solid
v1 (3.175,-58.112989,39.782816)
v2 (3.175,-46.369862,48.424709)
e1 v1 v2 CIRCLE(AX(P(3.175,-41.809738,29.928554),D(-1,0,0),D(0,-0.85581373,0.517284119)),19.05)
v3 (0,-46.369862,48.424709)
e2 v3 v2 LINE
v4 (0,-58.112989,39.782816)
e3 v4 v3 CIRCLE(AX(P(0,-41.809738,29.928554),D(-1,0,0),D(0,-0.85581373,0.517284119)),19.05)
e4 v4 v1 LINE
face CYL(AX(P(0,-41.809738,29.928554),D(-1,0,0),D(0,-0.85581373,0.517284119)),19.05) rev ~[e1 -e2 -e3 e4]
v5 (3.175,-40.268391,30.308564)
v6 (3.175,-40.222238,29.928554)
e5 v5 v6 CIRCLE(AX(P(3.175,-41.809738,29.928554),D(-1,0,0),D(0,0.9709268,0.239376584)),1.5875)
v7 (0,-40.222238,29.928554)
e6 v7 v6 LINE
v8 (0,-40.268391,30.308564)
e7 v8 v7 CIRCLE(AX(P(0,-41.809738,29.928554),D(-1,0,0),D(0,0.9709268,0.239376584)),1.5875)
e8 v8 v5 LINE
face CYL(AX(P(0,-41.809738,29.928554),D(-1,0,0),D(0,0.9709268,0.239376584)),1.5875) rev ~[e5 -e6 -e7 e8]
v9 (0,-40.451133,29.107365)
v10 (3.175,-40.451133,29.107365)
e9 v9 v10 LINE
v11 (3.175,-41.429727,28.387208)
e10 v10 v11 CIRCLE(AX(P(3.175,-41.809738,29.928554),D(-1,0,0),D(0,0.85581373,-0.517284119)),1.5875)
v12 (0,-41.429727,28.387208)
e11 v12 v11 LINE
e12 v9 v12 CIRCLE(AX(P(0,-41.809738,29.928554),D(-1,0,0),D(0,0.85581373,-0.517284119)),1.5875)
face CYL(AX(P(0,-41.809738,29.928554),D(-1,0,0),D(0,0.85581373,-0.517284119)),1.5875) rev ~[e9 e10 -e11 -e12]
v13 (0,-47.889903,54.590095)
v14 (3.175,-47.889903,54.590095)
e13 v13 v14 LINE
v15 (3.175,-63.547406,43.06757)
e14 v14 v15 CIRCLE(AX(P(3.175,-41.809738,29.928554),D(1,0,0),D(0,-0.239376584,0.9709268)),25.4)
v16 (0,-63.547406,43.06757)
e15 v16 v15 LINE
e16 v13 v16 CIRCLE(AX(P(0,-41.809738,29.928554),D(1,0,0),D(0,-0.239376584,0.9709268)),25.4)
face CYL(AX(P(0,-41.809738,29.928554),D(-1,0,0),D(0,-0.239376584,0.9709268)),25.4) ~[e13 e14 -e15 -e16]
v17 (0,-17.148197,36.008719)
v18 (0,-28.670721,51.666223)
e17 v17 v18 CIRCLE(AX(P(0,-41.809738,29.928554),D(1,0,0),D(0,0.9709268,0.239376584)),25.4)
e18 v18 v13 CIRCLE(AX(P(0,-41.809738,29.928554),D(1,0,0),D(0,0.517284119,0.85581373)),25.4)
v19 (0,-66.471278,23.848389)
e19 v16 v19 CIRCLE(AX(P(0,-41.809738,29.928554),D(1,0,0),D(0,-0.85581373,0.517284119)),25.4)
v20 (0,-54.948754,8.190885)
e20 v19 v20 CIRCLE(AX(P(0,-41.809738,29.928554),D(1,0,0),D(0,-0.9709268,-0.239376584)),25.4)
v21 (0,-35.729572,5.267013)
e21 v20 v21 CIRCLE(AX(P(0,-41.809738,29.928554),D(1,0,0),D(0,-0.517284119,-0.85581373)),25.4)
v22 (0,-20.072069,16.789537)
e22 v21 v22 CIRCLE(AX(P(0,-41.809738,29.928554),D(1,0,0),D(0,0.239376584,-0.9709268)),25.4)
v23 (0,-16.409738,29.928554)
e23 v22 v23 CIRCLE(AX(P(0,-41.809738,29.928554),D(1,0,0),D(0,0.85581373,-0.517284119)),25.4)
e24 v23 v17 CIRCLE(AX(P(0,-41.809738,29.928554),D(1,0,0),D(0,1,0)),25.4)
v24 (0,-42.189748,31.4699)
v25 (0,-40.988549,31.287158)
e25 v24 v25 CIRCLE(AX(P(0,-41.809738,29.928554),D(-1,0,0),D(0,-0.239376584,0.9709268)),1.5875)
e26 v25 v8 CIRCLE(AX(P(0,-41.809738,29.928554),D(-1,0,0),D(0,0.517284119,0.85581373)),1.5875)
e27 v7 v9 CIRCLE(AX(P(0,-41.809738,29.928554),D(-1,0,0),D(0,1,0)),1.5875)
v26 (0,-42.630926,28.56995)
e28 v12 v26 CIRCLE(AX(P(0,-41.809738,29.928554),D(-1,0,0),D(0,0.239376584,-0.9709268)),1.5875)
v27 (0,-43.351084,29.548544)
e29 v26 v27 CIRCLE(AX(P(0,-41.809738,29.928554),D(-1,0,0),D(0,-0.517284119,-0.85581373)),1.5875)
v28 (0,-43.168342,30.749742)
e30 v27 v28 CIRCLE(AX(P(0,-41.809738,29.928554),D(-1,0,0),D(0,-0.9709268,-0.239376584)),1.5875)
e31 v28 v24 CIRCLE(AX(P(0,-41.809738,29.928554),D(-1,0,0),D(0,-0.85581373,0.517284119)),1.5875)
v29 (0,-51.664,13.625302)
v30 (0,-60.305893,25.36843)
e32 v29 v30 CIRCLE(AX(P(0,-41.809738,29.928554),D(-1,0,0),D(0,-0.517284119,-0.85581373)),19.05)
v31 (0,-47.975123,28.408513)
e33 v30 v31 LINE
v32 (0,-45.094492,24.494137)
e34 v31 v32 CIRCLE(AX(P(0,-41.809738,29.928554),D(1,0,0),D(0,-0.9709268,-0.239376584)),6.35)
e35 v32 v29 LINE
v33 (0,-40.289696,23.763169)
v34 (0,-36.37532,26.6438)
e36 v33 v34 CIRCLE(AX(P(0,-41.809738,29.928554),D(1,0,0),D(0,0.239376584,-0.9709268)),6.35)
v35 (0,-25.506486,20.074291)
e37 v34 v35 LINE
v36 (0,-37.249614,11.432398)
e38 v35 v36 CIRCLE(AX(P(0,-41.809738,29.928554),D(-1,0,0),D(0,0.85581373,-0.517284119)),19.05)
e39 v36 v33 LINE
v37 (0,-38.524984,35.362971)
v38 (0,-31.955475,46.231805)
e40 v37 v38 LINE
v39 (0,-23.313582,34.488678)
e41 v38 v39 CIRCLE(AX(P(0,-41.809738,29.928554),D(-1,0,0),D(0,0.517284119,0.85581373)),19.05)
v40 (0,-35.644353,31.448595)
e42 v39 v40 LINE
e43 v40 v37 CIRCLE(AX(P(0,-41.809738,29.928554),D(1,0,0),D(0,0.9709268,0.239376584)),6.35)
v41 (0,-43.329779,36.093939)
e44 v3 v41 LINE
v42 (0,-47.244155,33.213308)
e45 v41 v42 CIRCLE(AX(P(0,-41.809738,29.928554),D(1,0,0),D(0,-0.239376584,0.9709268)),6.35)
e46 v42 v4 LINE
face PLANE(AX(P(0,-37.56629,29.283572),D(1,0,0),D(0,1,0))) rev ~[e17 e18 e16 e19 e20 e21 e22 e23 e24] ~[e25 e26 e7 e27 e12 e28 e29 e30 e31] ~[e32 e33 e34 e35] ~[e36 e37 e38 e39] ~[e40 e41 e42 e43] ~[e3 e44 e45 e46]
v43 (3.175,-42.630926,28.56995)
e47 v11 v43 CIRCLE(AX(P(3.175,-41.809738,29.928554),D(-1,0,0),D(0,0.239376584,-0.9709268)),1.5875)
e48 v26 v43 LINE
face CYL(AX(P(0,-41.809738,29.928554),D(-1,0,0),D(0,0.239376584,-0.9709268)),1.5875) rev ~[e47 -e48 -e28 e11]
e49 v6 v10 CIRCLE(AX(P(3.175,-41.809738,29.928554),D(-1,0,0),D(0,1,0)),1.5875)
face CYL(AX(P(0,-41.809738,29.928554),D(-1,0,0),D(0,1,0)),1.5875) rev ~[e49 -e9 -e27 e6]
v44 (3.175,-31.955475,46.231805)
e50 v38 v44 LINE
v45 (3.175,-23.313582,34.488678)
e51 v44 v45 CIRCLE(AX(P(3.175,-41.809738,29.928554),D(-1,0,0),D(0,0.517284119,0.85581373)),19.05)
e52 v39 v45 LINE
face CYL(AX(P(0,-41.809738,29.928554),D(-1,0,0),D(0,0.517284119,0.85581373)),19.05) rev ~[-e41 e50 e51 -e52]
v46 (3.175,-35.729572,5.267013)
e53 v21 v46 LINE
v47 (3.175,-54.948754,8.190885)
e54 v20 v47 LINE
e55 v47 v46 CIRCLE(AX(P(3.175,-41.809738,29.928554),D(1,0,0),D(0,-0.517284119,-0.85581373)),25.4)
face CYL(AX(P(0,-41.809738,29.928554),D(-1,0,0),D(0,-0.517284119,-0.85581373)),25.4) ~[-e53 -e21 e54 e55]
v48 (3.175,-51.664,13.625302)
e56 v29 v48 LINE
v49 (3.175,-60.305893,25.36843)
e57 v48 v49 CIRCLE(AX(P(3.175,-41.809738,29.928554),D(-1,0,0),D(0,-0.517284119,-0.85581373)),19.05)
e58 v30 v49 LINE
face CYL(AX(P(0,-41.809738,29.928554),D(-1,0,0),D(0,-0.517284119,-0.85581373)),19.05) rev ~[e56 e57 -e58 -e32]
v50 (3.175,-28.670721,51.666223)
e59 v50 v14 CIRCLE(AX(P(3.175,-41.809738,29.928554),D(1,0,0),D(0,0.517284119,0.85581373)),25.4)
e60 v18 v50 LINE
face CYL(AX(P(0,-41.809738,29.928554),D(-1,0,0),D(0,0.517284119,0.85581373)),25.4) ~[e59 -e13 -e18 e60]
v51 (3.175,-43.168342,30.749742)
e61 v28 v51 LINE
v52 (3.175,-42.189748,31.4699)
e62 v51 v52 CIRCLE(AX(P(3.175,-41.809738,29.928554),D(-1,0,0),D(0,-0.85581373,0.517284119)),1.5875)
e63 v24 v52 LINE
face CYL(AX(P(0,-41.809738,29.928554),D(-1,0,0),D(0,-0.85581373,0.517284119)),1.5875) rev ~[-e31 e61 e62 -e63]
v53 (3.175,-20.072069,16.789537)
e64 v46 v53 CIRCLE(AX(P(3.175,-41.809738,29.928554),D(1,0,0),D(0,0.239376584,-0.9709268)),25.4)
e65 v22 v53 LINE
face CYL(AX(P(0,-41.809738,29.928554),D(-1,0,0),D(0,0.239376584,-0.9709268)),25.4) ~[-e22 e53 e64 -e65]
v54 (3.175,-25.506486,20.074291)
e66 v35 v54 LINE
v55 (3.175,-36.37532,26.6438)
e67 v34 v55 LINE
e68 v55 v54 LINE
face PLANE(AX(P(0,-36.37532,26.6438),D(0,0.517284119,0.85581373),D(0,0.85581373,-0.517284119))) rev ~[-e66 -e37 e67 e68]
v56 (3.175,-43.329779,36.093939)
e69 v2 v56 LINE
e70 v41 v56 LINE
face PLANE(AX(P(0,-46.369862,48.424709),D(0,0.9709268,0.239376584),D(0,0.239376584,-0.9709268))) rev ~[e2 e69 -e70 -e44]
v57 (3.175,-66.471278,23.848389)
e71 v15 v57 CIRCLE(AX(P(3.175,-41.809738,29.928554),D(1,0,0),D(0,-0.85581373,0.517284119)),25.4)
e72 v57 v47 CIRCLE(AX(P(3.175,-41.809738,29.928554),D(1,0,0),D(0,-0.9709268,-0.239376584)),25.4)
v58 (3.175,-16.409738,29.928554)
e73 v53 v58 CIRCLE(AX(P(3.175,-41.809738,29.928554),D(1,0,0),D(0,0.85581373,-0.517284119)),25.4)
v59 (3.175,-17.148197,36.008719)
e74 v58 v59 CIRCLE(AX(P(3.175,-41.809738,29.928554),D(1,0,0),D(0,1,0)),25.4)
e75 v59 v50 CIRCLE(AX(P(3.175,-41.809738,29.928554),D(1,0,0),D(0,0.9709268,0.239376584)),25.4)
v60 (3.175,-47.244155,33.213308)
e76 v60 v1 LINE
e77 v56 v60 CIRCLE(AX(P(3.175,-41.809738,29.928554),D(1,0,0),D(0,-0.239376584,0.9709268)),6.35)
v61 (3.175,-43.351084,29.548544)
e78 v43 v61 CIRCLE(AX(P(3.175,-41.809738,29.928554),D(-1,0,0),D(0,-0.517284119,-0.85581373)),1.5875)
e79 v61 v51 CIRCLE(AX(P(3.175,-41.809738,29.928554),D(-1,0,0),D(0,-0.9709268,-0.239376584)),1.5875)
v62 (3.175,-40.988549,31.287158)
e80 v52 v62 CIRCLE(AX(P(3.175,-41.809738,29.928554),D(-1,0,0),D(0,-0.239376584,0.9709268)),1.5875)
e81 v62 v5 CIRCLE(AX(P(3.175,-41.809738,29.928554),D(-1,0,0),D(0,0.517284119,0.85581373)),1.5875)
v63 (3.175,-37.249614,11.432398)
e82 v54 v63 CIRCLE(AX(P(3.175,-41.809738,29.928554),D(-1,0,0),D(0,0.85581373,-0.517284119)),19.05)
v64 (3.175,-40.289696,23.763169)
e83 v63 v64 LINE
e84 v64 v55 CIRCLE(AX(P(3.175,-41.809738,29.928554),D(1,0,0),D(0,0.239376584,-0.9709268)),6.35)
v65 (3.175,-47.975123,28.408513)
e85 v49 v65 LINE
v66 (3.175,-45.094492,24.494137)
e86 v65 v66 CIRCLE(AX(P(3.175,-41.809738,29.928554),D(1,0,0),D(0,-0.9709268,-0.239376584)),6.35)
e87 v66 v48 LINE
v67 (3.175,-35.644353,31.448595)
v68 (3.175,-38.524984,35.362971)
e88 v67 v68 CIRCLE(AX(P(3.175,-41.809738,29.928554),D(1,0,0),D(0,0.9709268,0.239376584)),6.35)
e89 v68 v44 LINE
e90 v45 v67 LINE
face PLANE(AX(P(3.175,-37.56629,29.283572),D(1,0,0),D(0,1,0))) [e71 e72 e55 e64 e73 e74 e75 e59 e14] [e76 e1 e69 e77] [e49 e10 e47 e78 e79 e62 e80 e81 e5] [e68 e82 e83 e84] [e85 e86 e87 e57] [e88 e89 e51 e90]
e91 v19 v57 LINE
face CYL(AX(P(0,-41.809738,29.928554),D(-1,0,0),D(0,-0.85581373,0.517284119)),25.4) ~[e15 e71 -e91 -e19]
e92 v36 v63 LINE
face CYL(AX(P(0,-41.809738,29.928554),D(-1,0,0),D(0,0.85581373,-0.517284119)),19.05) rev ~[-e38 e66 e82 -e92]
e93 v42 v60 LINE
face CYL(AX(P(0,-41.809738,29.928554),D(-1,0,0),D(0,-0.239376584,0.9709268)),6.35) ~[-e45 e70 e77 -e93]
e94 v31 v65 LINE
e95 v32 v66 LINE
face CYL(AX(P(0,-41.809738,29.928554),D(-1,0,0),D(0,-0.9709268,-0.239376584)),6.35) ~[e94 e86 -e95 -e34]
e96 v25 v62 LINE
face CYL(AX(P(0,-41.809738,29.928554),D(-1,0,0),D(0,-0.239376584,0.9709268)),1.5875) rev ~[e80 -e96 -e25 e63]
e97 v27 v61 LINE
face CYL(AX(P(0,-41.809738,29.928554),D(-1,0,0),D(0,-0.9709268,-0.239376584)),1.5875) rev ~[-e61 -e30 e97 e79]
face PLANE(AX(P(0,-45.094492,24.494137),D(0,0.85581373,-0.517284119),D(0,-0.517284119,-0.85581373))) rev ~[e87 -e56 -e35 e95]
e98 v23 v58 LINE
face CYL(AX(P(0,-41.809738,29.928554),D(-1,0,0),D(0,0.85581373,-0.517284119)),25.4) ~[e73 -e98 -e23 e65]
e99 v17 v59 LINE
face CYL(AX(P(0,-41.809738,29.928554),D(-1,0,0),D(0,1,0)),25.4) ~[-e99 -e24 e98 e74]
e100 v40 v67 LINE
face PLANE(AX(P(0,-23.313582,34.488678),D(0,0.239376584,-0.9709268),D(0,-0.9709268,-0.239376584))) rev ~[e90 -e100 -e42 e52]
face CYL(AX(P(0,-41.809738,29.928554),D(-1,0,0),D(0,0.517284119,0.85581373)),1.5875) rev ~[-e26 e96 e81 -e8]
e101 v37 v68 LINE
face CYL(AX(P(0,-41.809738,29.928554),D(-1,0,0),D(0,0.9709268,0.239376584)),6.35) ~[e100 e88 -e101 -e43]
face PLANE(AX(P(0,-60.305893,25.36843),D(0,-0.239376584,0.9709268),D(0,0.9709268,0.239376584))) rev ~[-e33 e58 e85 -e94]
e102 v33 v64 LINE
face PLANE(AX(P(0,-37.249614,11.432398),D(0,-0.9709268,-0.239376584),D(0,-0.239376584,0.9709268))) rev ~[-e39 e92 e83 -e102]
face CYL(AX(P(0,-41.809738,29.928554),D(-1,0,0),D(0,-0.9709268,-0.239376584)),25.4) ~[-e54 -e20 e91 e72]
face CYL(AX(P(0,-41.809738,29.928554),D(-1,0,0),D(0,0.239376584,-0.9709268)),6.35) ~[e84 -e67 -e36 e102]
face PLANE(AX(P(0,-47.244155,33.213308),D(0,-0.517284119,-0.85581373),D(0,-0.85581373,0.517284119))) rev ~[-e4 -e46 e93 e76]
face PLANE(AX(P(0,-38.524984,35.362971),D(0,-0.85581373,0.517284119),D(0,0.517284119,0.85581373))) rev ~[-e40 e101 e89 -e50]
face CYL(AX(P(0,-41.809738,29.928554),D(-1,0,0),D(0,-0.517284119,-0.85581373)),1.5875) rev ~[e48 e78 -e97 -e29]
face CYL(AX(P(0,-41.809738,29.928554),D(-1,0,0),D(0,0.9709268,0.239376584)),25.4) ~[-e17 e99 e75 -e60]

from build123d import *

# Parameters (mm, degrees)
F1_DEPTH = 3.175


with BuildPart() as f1:
    # F0 (on Right) → F1 (new body)
    with BuildSketch(Plane.YZ):
        with BuildLine():
            Line((-40.4511333859, 29.1073653109), (-36.3753204967, 26.6437996954))
            ThreePointArc((-36.3753204967, 26.6437996954), (-35.6929146046, 28.2235683845), (-35.4597376823, 29.9285538495))
            ThreePointArc((-35.4597376823, 29.9285538495), (-35.506060347, 30.6941595257), (-35.6443525017, 31.4485951564))
            Line((-35.6443525017, 31.4485951564), (-40.2683913872, 30.3085641762))
            ThreePointArc((-40.2683913872, 30.3085641762), (-40.2338183485, 30.1199552685), (-40.2222376823, 29.9285538495))
            ThreePointArc((-40.2222376823, 29.9285538495), (-40.2805319129, 29.5023074832), (-40.4511333859, 29.1073653109))
        make_face()
        with BuildLine():
            ThreePointArc((-40.2896963754, 23.7631686688), (-38.0460118676, 24.8141752957), (-36.3753204967, 26.6437996954))
            Line((-36.3753204967, 26.6437996954), (-40.4511333859, 29.1073653109))
            ThreePointArc((-40.4511333859, 29.1073653109), (-40.8688062286, 28.649959211), (-41.4297273556, 28.3872075543))
            Line((-41.4297273556, 28.3872075543), (-40.2896963754, 23.7631686688))
        make_face()
        with BuildLine():
            ThreePointArc((-35.4597376823, 29.9285538495), (-35.6929146046, 28.2235683845), (-36.3753204967, 26.6437996954))
            Line((-36.3753204967, 26.6437996954), (-25.5064861254, 20.0742913873))
            ThreePointArc((-25.5064861254, 20.0742913873), (-23.4592684491, 24.8135974547), (-22.7597376823, 29.9285538495))
            ThreePointArc((-22.7597376823, 29.9285538495), (-22.8987056762, 32.2253708783), (-23.3135821405, 34.4886777702))
            Line((-23.3135821405, 34.4886777702), (-35.6443525017, 31.4485951564))
            ThreePointArc((-35.6443525017, 31.4485951564), (-35.506060347, 30.6941595257), (-35.4597376823, 29.9285538495))
        make_face()
        with BuildLine():
            Line((-37.2496137616, 11.4323983076), (-40.2896963754, 23.7631686688))
            ThreePointArc((-40.2896963754, 23.7631686688), (-42.7647933931, 23.6507860464), (-45.0944918364, 24.4941366638))
            Line((-45.0944918364, 24.4941366638), (-51.6640001445, 13.6253022926))
            ThreePointArc((-51.6640001445, 13.6253022926), (-44.6749048146, 11.0952504402), (-37.2496137616, 11.4323983076))
        make_face()
        with BuildLine():
            ThreePointArc((-45.0944918364, 24.4941366638), (-42.7647933931, 23.6507860464), (-40.2896963754, 23.7631686688))
            Line((-40.2896963754, 23.7631686688), (-41.4297273556, 28.3872075543))
            ThreePointArc((-41.4297273556, 28.3872075543), (-42.04850161, 28.3591118987), (-42.6309262209, 28.5699495531))
            Line((-42.6309262209, 28.5699495531), (-45.0944918364, 24.4941366638))
        make_face()
        with BuildLine():
            ThreePointArc((-22.7597376823, 29.9285538495), (-23.4592684491, 24.8135974547), (-25.5064861254, 20.0742913873))
            Line((-25.5064861254, 20.0742913873), (-20.0720689398, 16.7895372333))
            ThreePointArc((-20.0720689398, 16.7895372333), (-17.3424453714, 23.1086119897), (-16.4097376823, 29.9285538495))
            ThreePointArc((-16.4097376823, 29.9285538495), (-16.5950283409, 32.9909765546), (-17.1481969599, 36.0087190771))
            Line((-17.1481969599, 36.0087190771), (-23.3135821405, 34.4886777702))
            ThreePointArc((-23.3135821405, 34.4886777702), (-22.8987056762, 32.2253708783), (-22.7597376823, 29.9285538495))
        make_face()
        with BuildLine():
            Line((-20.0720689398, 16.7895372333), (-25.5064861254, 20.0742913873))
            ThreePointArc((-25.5064861254, 20.0742913873), (-30.518560238, 14.5854181882), (-37.2496137616, 11.4323983076))
            Line((-37.2496137616, 11.4323983076), (-35.7295724547, 5.267013127))
            ThreePointArc((-35.7295724547, 5.267013127), (-26.7548344232, 9.4710396345), (-20.0720689398, 16.7895372333))
        make_face()
        with BuildLine():
            Line((-40.2683913872, 30.3085641762), (-35.6443525017, 31.4485951564))
            ThreePointArc((-35.6443525017, 31.4485951564), (-36.6953591286, 33.6922796642), (-38.5249835283, 35.3629710351))
            Line((-38.5249835283, 35.3629710351), (-40.9885491438, 31.2871581459))
            ThreePointArc((-40.9885491438, 31.2871581459), (-40.5311430439, 30.8694853032), (-40.2683913872, 30.3085641762))
        make_face()
        with BuildLine():
            ThreePointArc((-47.975122863, 28.4085125426), (-46.9241162361, 26.1648280347), (-45.0944918364, 24.4941366638))
            Line((-45.0944918364, 24.4941366638), (-42.6309262209, 28.5699495531))
            ThreePointArc((-42.6309262209, 28.5699495531), (-43.0883323208, 28.9876223958), (-43.3510839775, 29.5485435227))
            Line((-43.3510839775, 29.5485435227), (-47.975122863, 28.4085125426))
        make_face()
        with BuildLine():
            Line((-35.7295724547, 5.267013127), (-37.2496137616, 11.4323983076))
            ThreePointArc((-37.2496137616, 11.4323983076), (-44.6749048146, 11.0952504402), (-51.6640001445, 13.6253022926))
            Line((-51.6640001445, 13.6253022926), (-54.9487542985, 8.1908851069))
            ThreePointArc((-54.9487542985, 8.1908851069), (-45.6299605253, 4.8174826371), (-35.7295724547, 5.267013127))
        make_face()
        with BuildLine():
            Line((-40.9885491438, 31.2871581459), (-38.5249835283, 35.3629710351))
            ThreePointArc((-38.5249835283, 35.3629710351), (-40.8546819716, 36.2063216525), (-43.3297789892, 36.0939390301))
            Line((-43.3297789892, 36.0939390301), (-42.1897480091, 31.4699001446))
            ThreePointArc((-42.1897480091, 31.4699001446), (-41.5709737547, 31.4979958002), (-40.9885491438, 31.2871581459))
        make_face()
        with BuildLine():
            ThreePointArc((-43.3297789892, 36.0939390301), (-40.8546819716, 36.2063216525), (-38.5249835283, 35.3629710351))
            Line((-38.5249835283, 35.3629710351), (-31.9554752202, 46.2318054064))
            ThreePointArc((-31.9554752202, 46.2318054064), (-38.9445705501, 48.7618572587), (-46.3698616031, 48.4247093913))
            Line((-46.3698616031, 48.4247093913), (-43.3297789892, 36.0939390301))
        make_face()
        with BuildLine():
            ThreePointArc((-31.9554752202, 46.2318054064), (-26.4666020211, 41.2197312938), (-23.3135821405, 34.4886777702))
            Line((-23.3135821405, 34.4886777702), (-17.1481969599, 36.0087190771))
            ThreePointArc((-17.1481969599, 36.0087190771), (-21.3522234673, 44.9834571086), (-28.6707210662, 51.666222592))
            Line((-28.6707210662, 51.666222592), (-31.9554752202, 46.2318054064))
        make_face()
        with BuildLine():
            Line((-60.3058932242, 25.3684299287), (-47.975122863, 28.4085125426))
            ThreePointArc((-47.975122863, 28.4085125426), (-48.0875054854, 30.8836095602), (-47.244154868, 33.2133080035))
            Line((-47.244154868, 33.2133080035), (-58.1129892392, 39.7828163116))
            ThreePointArc((-58.1129892392, 39.7828163116), (-60.6430410916, 32.7937209817), (-60.3058932242, 25.3684299287))
        make_face()
        with BuildLine():
            ThreePointArc((-47.244154868, 33.2133080035), (-48.0875054854, 30.8836095602), (-47.975122863, 28.4085125426))
            Line((-47.975122863, 28.4085125426), (-43.3510839775, 29.5485435227))
            ThreePointArc((-43.3510839775, 29.5485435227), (-43.3791796331, 30.1673177771), (-43.1683419788, 30.749742388))
            Line((-43.1683419788, 30.749742388), (-47.244154868, 33.2133080035))
        make_face()
        with BuildLine():
            Line((-54.9487542985, 8.1908851069), (-51.6640001445, 13.6253022926))
            ThreePointArc((-51.6640001445, 13.6253022926), (-57.1528733436, 18.6373764051), (-60.3058932242, 25.3684299287))
            Line((-60.3058932242, 25.3684299287), (-66.4712784048, 23.8483886218))
            ThreePointArc((-66.4712784048, 23.8483886218), (-62.2672518974, 14.8736505903), (-54.9487542985, 8.1908851069))
        make_face()
        with BuildLine():
            Line((-47.244154868, 33.2133080035), (-43.1683419788, 30.749742388))
            ThreePointArc((-43.1683419788, 30.749742388), (-42.750669136, 31.2071484879), (-42.1897480091, 31.4699001446))
            Line((-42.1897480091, 31.4699001446), (-43.3297789892, 36.0939390301))
            ThreePointArc((-43.3297789892, 36.0939390301), (-45.5734634971, 35.0429324032), (-47.244154868, 33.2133080035))
        make_face()
        with BuildLine():
            ThreePointArc((-46.3698616031, 48.4247093913), (-38.9445705501, 48.7618572587), (-31.9554752202, 46.2318054064))
            Line((-31.9554752202, 46.2318054064), (-28.6707210662, 51.666222592))
            ThreePointArc((-28.6707210662, 51.666222592), (-37.9895148394, 55.0396250618), (-47.88990291, 54.5900945719))
            Line((-47.88990291, 54.5900945719), (-46.3698616031, 48.4247093913))
        make_face()
        with BuildLine():
            Line((-66.4712784048, 23.8483886218), (-60.3058932242, 25.3684299287))
            ThreePointArc((-60.3058932242, 25.3684299287), (-60.6430410916, 32.7937209817), (-58.1129892392, 39.7828163116))
            Line((-58.1129892392, 39.7828163116), (-63.5474064249, 43.0675704656))
            ThreePointArc((-63.5474064249, 43.0675704656), (-66.9208088947, 33.7487766925), (-66.4712784048, 23.8483886218))
        make_face()
        with BuildLine():
            ThreePointArc((-58.1129892392, 39.7828163116), (-53.1009151267, 45.2716895107), (-46.3698616031, 48.4247093913))
            Line((-46.3698616031, 48.4247093913), (-47.88990291, 54.5900945719))
            ThreePointArc((-47.88990291, 54.5900945719), (-56.8646409415, 50.3860680645), (-63.5474064249, 43.0675704656))
            Line((-63.5474064249, 43.0675704656), (-58.1129892392, 39.7828163116))
        make_face()
    extrude(amount=F1_DEPTH)


solid = f1.part
